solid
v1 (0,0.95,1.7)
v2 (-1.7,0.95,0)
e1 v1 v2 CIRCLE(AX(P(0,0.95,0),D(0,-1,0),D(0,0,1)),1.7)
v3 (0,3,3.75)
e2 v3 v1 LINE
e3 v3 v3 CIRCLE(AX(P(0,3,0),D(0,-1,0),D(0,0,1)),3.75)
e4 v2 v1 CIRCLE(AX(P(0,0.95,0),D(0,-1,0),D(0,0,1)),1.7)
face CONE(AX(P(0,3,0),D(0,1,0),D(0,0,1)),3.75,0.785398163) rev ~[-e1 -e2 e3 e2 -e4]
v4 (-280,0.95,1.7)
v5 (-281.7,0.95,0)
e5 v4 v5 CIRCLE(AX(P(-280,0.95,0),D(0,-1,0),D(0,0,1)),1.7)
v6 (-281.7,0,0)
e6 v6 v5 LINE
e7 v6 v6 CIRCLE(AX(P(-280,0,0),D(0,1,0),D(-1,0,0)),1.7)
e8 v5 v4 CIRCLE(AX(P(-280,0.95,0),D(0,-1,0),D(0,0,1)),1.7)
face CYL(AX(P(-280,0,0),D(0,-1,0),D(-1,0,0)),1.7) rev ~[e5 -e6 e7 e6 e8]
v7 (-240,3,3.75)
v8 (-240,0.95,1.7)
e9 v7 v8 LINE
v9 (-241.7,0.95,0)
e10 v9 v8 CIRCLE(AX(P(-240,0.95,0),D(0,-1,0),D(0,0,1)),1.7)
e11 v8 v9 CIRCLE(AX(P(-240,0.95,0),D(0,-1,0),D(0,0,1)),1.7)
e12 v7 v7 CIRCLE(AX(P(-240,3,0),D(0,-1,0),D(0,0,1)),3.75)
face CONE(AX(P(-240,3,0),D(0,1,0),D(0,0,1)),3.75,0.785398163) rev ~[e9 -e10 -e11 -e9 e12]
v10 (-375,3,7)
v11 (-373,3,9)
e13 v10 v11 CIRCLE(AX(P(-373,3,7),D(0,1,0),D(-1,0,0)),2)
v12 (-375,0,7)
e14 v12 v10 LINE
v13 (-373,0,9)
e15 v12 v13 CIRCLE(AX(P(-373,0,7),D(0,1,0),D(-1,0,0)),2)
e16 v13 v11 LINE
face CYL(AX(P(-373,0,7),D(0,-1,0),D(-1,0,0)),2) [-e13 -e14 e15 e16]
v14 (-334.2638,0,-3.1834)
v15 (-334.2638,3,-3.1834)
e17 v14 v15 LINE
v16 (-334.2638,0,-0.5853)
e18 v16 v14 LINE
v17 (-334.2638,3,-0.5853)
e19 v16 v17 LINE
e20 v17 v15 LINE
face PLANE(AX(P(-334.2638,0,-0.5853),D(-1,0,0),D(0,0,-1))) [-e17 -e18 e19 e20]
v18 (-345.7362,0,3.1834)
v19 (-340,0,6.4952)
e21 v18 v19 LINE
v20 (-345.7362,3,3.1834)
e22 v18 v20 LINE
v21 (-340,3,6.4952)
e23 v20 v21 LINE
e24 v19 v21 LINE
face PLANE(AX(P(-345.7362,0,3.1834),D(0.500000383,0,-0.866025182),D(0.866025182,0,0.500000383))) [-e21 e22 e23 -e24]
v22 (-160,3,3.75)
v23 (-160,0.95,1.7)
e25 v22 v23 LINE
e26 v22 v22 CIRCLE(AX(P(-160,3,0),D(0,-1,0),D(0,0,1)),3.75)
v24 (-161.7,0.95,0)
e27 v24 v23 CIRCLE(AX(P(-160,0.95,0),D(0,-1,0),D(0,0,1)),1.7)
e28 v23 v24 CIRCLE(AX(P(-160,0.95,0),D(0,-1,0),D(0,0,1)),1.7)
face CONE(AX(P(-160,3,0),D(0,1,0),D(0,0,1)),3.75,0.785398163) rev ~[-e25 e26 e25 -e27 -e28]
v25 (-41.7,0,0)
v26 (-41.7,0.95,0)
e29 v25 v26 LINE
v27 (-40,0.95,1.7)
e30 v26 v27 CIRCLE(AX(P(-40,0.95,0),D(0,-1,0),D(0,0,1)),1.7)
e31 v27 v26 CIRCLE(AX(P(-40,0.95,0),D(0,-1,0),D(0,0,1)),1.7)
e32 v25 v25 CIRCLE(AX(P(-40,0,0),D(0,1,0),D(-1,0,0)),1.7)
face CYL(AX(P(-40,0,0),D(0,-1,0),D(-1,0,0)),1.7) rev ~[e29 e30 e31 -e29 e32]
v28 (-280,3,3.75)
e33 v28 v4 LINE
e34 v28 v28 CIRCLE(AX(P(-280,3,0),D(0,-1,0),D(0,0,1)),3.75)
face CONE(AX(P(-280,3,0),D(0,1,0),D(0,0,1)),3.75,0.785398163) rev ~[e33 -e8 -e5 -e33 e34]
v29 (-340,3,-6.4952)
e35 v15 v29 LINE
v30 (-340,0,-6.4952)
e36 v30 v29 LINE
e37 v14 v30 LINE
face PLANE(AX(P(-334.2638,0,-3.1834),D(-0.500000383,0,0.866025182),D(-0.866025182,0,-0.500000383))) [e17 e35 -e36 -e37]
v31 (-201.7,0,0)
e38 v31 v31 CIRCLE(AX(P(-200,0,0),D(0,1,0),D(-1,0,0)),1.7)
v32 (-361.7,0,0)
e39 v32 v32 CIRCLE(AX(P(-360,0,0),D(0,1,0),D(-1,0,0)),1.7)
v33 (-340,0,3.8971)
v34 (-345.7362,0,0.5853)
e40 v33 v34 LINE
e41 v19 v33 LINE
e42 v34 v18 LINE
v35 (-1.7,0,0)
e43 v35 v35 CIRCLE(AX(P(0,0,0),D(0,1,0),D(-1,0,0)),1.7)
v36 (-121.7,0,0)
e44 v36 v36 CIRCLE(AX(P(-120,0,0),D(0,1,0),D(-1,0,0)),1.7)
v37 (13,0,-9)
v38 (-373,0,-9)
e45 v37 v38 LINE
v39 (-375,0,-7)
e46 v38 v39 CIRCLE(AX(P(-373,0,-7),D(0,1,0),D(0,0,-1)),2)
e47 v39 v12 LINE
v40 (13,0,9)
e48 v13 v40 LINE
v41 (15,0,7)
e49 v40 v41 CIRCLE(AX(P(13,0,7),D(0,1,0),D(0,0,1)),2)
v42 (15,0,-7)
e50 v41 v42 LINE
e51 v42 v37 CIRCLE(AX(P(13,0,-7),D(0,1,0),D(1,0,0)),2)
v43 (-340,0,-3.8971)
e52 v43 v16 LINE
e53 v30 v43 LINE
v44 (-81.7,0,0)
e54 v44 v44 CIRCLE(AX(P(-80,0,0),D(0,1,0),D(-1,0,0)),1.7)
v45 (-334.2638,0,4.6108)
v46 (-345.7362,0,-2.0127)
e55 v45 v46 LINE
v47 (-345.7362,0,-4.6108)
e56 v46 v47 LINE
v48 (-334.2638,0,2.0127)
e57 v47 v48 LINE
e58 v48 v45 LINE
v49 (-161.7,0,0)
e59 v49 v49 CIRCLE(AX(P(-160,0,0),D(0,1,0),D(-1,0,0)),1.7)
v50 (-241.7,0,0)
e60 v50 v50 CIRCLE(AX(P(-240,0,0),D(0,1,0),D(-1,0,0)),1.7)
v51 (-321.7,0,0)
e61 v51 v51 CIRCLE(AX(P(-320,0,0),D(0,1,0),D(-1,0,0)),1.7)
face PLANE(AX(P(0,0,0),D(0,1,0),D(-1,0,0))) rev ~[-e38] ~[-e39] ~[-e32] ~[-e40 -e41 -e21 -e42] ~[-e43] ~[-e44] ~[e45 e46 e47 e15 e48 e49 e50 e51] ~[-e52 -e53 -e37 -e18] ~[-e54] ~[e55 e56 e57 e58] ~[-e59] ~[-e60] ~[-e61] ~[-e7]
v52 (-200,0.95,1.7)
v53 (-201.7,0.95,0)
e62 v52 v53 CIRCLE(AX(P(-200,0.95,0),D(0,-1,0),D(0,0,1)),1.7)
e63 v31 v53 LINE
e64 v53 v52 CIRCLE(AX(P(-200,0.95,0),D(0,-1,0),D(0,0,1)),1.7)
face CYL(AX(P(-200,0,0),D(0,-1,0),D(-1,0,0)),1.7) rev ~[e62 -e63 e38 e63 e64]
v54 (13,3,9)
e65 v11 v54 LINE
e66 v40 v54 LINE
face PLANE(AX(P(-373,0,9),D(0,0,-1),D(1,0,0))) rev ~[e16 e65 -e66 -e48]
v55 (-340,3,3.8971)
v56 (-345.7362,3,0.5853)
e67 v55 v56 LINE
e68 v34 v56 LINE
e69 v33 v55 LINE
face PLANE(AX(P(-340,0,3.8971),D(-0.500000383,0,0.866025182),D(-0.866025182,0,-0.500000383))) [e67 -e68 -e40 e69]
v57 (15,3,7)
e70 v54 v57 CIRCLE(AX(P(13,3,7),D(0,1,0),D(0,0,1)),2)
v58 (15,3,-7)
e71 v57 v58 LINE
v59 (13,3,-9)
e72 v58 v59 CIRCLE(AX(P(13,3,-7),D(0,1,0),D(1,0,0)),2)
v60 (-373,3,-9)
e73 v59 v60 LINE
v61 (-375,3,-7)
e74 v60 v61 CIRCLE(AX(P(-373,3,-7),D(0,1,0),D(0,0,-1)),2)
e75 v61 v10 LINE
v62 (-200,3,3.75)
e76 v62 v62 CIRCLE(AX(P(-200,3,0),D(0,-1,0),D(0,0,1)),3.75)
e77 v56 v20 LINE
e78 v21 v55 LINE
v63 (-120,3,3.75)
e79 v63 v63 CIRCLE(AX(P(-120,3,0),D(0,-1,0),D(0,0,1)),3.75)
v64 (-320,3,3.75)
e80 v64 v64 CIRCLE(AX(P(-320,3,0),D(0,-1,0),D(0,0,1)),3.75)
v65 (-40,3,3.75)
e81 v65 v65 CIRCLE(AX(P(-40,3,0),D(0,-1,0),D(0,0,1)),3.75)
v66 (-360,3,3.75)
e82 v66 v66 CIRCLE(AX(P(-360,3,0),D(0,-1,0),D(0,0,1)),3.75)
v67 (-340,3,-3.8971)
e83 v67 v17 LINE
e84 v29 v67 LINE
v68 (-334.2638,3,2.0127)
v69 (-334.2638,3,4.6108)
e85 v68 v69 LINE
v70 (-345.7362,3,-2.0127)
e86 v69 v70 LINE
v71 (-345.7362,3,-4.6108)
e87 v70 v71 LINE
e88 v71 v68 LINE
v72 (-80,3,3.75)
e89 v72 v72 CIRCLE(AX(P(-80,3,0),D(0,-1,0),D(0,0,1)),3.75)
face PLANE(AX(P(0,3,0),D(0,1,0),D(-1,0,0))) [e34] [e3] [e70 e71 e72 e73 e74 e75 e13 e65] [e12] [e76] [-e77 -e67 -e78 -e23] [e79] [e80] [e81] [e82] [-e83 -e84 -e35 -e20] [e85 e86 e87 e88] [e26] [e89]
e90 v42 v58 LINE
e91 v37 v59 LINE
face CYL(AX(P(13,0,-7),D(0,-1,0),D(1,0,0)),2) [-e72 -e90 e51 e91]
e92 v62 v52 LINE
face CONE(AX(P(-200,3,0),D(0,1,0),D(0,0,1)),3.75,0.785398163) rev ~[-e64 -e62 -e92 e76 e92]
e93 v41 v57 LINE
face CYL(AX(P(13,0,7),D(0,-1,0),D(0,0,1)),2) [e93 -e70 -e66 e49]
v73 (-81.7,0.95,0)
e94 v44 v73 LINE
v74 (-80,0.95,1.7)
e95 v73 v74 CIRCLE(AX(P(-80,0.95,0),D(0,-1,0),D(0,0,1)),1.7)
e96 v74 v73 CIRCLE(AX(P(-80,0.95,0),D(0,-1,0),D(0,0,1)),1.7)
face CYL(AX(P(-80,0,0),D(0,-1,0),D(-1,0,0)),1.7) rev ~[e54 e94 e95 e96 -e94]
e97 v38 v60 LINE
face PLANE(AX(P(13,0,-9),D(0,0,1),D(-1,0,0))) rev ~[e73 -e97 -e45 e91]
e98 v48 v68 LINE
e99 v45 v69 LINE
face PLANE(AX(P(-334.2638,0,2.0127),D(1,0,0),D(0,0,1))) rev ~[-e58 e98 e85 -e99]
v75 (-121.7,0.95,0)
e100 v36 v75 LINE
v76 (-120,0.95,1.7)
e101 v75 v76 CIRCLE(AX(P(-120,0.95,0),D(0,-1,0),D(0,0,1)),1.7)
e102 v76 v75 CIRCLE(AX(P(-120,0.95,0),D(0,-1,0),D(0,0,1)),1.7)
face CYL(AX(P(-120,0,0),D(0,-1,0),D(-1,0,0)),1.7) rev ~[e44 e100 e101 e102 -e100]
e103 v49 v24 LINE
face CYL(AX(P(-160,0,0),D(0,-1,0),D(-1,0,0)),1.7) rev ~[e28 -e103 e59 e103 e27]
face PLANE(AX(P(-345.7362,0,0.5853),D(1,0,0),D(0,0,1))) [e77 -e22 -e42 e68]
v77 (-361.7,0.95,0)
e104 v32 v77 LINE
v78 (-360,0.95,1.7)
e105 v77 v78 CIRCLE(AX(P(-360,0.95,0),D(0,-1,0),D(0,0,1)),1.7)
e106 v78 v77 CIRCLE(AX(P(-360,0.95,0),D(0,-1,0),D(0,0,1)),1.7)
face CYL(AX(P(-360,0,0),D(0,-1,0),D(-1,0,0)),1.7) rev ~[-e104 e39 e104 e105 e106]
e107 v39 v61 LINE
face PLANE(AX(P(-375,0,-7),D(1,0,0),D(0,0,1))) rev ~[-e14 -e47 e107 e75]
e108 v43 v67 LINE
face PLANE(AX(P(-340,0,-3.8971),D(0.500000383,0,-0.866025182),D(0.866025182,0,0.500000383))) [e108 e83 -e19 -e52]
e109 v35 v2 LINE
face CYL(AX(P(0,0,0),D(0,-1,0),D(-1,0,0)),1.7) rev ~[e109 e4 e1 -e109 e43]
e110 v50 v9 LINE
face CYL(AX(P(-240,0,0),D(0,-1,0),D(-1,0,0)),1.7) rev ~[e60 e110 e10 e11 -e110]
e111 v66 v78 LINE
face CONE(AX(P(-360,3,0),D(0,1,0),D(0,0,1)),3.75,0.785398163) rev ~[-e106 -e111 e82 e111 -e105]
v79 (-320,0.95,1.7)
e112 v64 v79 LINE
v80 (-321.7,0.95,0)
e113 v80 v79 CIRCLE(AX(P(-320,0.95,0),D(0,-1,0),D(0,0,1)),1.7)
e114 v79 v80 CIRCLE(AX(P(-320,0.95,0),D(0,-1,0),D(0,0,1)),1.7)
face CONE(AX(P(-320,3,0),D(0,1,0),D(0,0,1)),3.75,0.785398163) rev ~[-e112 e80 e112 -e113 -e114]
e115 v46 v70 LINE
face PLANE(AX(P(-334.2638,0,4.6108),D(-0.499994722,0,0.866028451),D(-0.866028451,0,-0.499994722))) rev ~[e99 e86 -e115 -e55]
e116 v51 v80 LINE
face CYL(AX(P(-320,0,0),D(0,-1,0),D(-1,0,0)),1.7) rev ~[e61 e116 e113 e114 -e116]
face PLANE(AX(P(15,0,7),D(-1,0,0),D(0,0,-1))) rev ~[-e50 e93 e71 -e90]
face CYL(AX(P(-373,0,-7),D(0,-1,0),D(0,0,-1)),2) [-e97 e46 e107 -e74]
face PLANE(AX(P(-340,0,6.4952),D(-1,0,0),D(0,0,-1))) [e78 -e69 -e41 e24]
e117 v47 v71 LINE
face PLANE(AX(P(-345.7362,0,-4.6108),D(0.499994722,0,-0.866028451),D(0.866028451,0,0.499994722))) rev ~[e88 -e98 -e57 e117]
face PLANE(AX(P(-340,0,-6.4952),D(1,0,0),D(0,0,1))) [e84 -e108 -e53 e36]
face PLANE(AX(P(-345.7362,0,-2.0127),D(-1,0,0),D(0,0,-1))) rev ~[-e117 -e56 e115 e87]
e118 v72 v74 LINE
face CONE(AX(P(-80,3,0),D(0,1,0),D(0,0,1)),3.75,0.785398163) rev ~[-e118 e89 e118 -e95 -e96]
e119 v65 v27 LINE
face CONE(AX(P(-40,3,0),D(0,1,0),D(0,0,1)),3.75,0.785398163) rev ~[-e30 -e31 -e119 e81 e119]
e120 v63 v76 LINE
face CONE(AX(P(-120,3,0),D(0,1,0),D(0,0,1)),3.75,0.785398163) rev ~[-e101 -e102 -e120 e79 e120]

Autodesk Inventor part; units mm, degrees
ref_plane "YZ Plane" through (0, 0, 0) normal (1, 0, 0) x (0, 1, 0)
ref_plane "XZ Plane" through (0, 0, 0) normal (0, 1, 0) x (-1, 0, 0)
ref_plane "XY Plane" through (0, 0, 0) normal (0, 0, 1) x (1, 0, 0)
sketch "ExtrusionBacker_Y_350mm_B" plane through (0, 0, 0) normal (0, 0, 1) x (1, 0, 0)
  arc A0 (355.9999, 24.106) -> (357.9999, 26.106) centre (355.9999, 26.106) ccw
  line L0 (357.9999, 26.106) -> (357.9999, 40.106)
  arc A1 (357.9999, 40.106) -> (355.9999, 42.106) centre (355.9999, 40.106) ccw
  line L1 (355.9999, 42.106) -> (-30.0001, 42.106)
  arc A2 (-30.0001, 42.106) -> (-32.0001, 40.106) centre (-30.0001, 40.106) ccw
  line L2 (-32.0001, 40.106) -> (-32.0001, 26.106)
  arc A3 (-32.0001, 26.106) -> (-30.0001, 24.106) centre (-30.0001, 26.106) ccw
  line L3 (-30.0001, 24.106) -> (355.9999, 24.106)
  line L4 (322.9999, 37.0031) -> (328.736, 33.6914)
  line L5 (328.736, 33.6914) -> (328.736, 36.2894)
  line L6 (328.736, 36.2894) -> (322.9999, 39.6012)
  line L7 (322.9999, 39.6012) -> (322.9999, 37.0031)
  line L8 (317.2637, 35.1187) -> (317.2637, 37.7168)
  line L9 (317.2637, 37.7168) -> (328.736, 31.0933)
  line L10 (328.736, 31.0933) -> (328.736, 28.4952)
  line L11 (328.736, 28.4952) -> (317.2637, 35.1187)
  line L12 (317.2637, 32.5207) -> (317.2637, 29.9226)
  line L13 (317.2637, 29.9226) -> (322.9999, 26.6108)
  line L14 (322.9999, 26.6108) -> (322.9999, 29.2089)
  line L15 (322.9999, 29.2089) -> (317.2637, 32.5207)
  circle A4 centre (102.9999, 33.106) radius 1.7
  circle A5 centre (142.9999, 33.106) radius 1.7
  circle A6 centre (222.9999, 33.106) radius 1.7
  circle A7 centre (182.9999, 33.106) radius 1.7
  circle A8 centre (62.9999, 33.106) radius 1.7
  circle A9 centre (302.9999, 33.106) radius 1.7
  circle A10 centre (342.9999, 33.106) radius 1.7
  circle A11 centre (-17.0001, 33.106) radius 1.7
  circle A12 centre (22.9999, 33.106) radius 1.7
  circle A13 centre (262.9999, 33.106) radius 1.7
sketch "Skizze1" plane through (0, 0, 0) normal (0, 1, 0) x (-1, 0, 0)
  arc A0 (373, -9) -> (375, -7) centre (373, -7) ccw
  line L0 (375, -7) -> (375, 7)
  arc A1 (375, 7) -> (373, 9) centre (373, 7) ccw
  line L1 (373, 9) -> (-13, 9)
  arc A2 (-13, 9) -> (-15, 7) centre (-13, 7) ccw
  line L2 (-15, 7) -> (-15, -7)
  arc A3 (-15, -7) -> (-13, -9) centre (-13, -7) ccw
  line L3 (-13, -9) -> (373, -9)
  line L4 (340, 3.8971) -> (345.7362, 0.5853)
  line L5 (345.7362, 0.5853) -> (345.7362, 3.1834)
  line L6 (345.7362, 3.1834) -> (340, 6.4952)
  line L7 (340, 6.4952) -> (340, 3.8971)
  line L8 (334.2638, 2.0127) -> (334.2638, 4.6108)
  line L9 (334.2638, 4.6108) -> (345.7362, -2.0127)
  line L10 (345.7362, -2.0127) -> (345.7362, -4.6108)
  line L11 (345.7362, -4.6108) -> (334.2638, 2.0127)
  line L12 (334.2638, -0.5853) -> (334.2638, -3.1834)
  line L13 (334.2638, -3.1834) -> (340, -6.4952)
  line L14 (340, -6.4952) -> (340, -3.8971)
  line L15 (340, -3.8971) -> (334.2638, -0.5853)
  circle A4 centre (120, 0) radius 1.7
  circle A5 centre (160, 0) radius 1.7
  circle A6 centre (240, 0) radius 1.7
  circle A7 centre (200, 0) radius 1.7
  circle A8 centre (80, 0) radius 1.7
  circle A9 centre (320, 0) radius 1.7
  circle A10 centre (360, 0) radius 1.7
  circle A11 centre (0, 0) radius 1.7
  circle A12 centre (40, 0) radius 1.7
  circle A13 centre (280, 0) radius 1.7
  point P0 (373, -9)
  point P1 (375, 7)
  point P2 (373, 9)
  point P3 (-13, 9)
  point P4 (-15, 7)
  point P5 (-15, -7)
  point P6 (-13, -9)
  point P7 (334.2638, -0.5853)
  point P8 (340, -3.8971)
  point P9 (340, -6.4952)
  point P10 (334.2638, -3.1834)
  point P11 (334.2638, 2.0127)
  point P12 (334.2638, 4.6108)
  point P13 (345.7362, -2.0127)
  point P14 (345.7362, -4.6108)
  point P15 (340, 3.8971)
  point P16 (340, 6.4952)
  point P17 (345.7362, 0.5853)
extrude "Extrusion1" add sketch "Skizze1" along normal blind 3
sketch "Skizze2" plane through (0, 3, 0) normal (0, 1, 0) x (1, 0, 0)
  circle A0 centre (-360, 0) radius 1.7 projected
  circle A1 centre (-320, 0) radius 1.7 projected
  circle A2 centre (-280, 0) radius 1.7 projected
  circle A3 centre (-240, 0) radius 1.7 projected
  circle A4 centre (-200, 0) radius 1.7 projected
  circle A5 centre (-160, 0) radius 1.7 projected
  circle A6 centre (-120, 0) radius 1.7 projected
  circle A7 centre (-80, 0) radius 1.7 projected
  circle A8 centre (-40, 0) radius 1.7 projected
  circle A9 centre (0, 0) radius 1.7 projected
hole "Bohrung1" at (-360, 3, 0) at (-320, 3, 0) at (-280, 3, 0) at (-240, 3, 0) at (-200, 3, 0) at (-160, 3, 0) at (-120, 3, 0) at (-80, 3, 0) at (-40, 3, 0) at (0, 3, 0) direction (0, -1, 0) diameter 3.4 end through all countersink diameter 7.5 countersink angle 90 clearance for "Innensechskant-Senkkopfschraube DIN EN ISO 10642" size "M3" standard "DIN"
properties part number "Y Extrusion-Backer [B] (350mm)" material "Titan"
